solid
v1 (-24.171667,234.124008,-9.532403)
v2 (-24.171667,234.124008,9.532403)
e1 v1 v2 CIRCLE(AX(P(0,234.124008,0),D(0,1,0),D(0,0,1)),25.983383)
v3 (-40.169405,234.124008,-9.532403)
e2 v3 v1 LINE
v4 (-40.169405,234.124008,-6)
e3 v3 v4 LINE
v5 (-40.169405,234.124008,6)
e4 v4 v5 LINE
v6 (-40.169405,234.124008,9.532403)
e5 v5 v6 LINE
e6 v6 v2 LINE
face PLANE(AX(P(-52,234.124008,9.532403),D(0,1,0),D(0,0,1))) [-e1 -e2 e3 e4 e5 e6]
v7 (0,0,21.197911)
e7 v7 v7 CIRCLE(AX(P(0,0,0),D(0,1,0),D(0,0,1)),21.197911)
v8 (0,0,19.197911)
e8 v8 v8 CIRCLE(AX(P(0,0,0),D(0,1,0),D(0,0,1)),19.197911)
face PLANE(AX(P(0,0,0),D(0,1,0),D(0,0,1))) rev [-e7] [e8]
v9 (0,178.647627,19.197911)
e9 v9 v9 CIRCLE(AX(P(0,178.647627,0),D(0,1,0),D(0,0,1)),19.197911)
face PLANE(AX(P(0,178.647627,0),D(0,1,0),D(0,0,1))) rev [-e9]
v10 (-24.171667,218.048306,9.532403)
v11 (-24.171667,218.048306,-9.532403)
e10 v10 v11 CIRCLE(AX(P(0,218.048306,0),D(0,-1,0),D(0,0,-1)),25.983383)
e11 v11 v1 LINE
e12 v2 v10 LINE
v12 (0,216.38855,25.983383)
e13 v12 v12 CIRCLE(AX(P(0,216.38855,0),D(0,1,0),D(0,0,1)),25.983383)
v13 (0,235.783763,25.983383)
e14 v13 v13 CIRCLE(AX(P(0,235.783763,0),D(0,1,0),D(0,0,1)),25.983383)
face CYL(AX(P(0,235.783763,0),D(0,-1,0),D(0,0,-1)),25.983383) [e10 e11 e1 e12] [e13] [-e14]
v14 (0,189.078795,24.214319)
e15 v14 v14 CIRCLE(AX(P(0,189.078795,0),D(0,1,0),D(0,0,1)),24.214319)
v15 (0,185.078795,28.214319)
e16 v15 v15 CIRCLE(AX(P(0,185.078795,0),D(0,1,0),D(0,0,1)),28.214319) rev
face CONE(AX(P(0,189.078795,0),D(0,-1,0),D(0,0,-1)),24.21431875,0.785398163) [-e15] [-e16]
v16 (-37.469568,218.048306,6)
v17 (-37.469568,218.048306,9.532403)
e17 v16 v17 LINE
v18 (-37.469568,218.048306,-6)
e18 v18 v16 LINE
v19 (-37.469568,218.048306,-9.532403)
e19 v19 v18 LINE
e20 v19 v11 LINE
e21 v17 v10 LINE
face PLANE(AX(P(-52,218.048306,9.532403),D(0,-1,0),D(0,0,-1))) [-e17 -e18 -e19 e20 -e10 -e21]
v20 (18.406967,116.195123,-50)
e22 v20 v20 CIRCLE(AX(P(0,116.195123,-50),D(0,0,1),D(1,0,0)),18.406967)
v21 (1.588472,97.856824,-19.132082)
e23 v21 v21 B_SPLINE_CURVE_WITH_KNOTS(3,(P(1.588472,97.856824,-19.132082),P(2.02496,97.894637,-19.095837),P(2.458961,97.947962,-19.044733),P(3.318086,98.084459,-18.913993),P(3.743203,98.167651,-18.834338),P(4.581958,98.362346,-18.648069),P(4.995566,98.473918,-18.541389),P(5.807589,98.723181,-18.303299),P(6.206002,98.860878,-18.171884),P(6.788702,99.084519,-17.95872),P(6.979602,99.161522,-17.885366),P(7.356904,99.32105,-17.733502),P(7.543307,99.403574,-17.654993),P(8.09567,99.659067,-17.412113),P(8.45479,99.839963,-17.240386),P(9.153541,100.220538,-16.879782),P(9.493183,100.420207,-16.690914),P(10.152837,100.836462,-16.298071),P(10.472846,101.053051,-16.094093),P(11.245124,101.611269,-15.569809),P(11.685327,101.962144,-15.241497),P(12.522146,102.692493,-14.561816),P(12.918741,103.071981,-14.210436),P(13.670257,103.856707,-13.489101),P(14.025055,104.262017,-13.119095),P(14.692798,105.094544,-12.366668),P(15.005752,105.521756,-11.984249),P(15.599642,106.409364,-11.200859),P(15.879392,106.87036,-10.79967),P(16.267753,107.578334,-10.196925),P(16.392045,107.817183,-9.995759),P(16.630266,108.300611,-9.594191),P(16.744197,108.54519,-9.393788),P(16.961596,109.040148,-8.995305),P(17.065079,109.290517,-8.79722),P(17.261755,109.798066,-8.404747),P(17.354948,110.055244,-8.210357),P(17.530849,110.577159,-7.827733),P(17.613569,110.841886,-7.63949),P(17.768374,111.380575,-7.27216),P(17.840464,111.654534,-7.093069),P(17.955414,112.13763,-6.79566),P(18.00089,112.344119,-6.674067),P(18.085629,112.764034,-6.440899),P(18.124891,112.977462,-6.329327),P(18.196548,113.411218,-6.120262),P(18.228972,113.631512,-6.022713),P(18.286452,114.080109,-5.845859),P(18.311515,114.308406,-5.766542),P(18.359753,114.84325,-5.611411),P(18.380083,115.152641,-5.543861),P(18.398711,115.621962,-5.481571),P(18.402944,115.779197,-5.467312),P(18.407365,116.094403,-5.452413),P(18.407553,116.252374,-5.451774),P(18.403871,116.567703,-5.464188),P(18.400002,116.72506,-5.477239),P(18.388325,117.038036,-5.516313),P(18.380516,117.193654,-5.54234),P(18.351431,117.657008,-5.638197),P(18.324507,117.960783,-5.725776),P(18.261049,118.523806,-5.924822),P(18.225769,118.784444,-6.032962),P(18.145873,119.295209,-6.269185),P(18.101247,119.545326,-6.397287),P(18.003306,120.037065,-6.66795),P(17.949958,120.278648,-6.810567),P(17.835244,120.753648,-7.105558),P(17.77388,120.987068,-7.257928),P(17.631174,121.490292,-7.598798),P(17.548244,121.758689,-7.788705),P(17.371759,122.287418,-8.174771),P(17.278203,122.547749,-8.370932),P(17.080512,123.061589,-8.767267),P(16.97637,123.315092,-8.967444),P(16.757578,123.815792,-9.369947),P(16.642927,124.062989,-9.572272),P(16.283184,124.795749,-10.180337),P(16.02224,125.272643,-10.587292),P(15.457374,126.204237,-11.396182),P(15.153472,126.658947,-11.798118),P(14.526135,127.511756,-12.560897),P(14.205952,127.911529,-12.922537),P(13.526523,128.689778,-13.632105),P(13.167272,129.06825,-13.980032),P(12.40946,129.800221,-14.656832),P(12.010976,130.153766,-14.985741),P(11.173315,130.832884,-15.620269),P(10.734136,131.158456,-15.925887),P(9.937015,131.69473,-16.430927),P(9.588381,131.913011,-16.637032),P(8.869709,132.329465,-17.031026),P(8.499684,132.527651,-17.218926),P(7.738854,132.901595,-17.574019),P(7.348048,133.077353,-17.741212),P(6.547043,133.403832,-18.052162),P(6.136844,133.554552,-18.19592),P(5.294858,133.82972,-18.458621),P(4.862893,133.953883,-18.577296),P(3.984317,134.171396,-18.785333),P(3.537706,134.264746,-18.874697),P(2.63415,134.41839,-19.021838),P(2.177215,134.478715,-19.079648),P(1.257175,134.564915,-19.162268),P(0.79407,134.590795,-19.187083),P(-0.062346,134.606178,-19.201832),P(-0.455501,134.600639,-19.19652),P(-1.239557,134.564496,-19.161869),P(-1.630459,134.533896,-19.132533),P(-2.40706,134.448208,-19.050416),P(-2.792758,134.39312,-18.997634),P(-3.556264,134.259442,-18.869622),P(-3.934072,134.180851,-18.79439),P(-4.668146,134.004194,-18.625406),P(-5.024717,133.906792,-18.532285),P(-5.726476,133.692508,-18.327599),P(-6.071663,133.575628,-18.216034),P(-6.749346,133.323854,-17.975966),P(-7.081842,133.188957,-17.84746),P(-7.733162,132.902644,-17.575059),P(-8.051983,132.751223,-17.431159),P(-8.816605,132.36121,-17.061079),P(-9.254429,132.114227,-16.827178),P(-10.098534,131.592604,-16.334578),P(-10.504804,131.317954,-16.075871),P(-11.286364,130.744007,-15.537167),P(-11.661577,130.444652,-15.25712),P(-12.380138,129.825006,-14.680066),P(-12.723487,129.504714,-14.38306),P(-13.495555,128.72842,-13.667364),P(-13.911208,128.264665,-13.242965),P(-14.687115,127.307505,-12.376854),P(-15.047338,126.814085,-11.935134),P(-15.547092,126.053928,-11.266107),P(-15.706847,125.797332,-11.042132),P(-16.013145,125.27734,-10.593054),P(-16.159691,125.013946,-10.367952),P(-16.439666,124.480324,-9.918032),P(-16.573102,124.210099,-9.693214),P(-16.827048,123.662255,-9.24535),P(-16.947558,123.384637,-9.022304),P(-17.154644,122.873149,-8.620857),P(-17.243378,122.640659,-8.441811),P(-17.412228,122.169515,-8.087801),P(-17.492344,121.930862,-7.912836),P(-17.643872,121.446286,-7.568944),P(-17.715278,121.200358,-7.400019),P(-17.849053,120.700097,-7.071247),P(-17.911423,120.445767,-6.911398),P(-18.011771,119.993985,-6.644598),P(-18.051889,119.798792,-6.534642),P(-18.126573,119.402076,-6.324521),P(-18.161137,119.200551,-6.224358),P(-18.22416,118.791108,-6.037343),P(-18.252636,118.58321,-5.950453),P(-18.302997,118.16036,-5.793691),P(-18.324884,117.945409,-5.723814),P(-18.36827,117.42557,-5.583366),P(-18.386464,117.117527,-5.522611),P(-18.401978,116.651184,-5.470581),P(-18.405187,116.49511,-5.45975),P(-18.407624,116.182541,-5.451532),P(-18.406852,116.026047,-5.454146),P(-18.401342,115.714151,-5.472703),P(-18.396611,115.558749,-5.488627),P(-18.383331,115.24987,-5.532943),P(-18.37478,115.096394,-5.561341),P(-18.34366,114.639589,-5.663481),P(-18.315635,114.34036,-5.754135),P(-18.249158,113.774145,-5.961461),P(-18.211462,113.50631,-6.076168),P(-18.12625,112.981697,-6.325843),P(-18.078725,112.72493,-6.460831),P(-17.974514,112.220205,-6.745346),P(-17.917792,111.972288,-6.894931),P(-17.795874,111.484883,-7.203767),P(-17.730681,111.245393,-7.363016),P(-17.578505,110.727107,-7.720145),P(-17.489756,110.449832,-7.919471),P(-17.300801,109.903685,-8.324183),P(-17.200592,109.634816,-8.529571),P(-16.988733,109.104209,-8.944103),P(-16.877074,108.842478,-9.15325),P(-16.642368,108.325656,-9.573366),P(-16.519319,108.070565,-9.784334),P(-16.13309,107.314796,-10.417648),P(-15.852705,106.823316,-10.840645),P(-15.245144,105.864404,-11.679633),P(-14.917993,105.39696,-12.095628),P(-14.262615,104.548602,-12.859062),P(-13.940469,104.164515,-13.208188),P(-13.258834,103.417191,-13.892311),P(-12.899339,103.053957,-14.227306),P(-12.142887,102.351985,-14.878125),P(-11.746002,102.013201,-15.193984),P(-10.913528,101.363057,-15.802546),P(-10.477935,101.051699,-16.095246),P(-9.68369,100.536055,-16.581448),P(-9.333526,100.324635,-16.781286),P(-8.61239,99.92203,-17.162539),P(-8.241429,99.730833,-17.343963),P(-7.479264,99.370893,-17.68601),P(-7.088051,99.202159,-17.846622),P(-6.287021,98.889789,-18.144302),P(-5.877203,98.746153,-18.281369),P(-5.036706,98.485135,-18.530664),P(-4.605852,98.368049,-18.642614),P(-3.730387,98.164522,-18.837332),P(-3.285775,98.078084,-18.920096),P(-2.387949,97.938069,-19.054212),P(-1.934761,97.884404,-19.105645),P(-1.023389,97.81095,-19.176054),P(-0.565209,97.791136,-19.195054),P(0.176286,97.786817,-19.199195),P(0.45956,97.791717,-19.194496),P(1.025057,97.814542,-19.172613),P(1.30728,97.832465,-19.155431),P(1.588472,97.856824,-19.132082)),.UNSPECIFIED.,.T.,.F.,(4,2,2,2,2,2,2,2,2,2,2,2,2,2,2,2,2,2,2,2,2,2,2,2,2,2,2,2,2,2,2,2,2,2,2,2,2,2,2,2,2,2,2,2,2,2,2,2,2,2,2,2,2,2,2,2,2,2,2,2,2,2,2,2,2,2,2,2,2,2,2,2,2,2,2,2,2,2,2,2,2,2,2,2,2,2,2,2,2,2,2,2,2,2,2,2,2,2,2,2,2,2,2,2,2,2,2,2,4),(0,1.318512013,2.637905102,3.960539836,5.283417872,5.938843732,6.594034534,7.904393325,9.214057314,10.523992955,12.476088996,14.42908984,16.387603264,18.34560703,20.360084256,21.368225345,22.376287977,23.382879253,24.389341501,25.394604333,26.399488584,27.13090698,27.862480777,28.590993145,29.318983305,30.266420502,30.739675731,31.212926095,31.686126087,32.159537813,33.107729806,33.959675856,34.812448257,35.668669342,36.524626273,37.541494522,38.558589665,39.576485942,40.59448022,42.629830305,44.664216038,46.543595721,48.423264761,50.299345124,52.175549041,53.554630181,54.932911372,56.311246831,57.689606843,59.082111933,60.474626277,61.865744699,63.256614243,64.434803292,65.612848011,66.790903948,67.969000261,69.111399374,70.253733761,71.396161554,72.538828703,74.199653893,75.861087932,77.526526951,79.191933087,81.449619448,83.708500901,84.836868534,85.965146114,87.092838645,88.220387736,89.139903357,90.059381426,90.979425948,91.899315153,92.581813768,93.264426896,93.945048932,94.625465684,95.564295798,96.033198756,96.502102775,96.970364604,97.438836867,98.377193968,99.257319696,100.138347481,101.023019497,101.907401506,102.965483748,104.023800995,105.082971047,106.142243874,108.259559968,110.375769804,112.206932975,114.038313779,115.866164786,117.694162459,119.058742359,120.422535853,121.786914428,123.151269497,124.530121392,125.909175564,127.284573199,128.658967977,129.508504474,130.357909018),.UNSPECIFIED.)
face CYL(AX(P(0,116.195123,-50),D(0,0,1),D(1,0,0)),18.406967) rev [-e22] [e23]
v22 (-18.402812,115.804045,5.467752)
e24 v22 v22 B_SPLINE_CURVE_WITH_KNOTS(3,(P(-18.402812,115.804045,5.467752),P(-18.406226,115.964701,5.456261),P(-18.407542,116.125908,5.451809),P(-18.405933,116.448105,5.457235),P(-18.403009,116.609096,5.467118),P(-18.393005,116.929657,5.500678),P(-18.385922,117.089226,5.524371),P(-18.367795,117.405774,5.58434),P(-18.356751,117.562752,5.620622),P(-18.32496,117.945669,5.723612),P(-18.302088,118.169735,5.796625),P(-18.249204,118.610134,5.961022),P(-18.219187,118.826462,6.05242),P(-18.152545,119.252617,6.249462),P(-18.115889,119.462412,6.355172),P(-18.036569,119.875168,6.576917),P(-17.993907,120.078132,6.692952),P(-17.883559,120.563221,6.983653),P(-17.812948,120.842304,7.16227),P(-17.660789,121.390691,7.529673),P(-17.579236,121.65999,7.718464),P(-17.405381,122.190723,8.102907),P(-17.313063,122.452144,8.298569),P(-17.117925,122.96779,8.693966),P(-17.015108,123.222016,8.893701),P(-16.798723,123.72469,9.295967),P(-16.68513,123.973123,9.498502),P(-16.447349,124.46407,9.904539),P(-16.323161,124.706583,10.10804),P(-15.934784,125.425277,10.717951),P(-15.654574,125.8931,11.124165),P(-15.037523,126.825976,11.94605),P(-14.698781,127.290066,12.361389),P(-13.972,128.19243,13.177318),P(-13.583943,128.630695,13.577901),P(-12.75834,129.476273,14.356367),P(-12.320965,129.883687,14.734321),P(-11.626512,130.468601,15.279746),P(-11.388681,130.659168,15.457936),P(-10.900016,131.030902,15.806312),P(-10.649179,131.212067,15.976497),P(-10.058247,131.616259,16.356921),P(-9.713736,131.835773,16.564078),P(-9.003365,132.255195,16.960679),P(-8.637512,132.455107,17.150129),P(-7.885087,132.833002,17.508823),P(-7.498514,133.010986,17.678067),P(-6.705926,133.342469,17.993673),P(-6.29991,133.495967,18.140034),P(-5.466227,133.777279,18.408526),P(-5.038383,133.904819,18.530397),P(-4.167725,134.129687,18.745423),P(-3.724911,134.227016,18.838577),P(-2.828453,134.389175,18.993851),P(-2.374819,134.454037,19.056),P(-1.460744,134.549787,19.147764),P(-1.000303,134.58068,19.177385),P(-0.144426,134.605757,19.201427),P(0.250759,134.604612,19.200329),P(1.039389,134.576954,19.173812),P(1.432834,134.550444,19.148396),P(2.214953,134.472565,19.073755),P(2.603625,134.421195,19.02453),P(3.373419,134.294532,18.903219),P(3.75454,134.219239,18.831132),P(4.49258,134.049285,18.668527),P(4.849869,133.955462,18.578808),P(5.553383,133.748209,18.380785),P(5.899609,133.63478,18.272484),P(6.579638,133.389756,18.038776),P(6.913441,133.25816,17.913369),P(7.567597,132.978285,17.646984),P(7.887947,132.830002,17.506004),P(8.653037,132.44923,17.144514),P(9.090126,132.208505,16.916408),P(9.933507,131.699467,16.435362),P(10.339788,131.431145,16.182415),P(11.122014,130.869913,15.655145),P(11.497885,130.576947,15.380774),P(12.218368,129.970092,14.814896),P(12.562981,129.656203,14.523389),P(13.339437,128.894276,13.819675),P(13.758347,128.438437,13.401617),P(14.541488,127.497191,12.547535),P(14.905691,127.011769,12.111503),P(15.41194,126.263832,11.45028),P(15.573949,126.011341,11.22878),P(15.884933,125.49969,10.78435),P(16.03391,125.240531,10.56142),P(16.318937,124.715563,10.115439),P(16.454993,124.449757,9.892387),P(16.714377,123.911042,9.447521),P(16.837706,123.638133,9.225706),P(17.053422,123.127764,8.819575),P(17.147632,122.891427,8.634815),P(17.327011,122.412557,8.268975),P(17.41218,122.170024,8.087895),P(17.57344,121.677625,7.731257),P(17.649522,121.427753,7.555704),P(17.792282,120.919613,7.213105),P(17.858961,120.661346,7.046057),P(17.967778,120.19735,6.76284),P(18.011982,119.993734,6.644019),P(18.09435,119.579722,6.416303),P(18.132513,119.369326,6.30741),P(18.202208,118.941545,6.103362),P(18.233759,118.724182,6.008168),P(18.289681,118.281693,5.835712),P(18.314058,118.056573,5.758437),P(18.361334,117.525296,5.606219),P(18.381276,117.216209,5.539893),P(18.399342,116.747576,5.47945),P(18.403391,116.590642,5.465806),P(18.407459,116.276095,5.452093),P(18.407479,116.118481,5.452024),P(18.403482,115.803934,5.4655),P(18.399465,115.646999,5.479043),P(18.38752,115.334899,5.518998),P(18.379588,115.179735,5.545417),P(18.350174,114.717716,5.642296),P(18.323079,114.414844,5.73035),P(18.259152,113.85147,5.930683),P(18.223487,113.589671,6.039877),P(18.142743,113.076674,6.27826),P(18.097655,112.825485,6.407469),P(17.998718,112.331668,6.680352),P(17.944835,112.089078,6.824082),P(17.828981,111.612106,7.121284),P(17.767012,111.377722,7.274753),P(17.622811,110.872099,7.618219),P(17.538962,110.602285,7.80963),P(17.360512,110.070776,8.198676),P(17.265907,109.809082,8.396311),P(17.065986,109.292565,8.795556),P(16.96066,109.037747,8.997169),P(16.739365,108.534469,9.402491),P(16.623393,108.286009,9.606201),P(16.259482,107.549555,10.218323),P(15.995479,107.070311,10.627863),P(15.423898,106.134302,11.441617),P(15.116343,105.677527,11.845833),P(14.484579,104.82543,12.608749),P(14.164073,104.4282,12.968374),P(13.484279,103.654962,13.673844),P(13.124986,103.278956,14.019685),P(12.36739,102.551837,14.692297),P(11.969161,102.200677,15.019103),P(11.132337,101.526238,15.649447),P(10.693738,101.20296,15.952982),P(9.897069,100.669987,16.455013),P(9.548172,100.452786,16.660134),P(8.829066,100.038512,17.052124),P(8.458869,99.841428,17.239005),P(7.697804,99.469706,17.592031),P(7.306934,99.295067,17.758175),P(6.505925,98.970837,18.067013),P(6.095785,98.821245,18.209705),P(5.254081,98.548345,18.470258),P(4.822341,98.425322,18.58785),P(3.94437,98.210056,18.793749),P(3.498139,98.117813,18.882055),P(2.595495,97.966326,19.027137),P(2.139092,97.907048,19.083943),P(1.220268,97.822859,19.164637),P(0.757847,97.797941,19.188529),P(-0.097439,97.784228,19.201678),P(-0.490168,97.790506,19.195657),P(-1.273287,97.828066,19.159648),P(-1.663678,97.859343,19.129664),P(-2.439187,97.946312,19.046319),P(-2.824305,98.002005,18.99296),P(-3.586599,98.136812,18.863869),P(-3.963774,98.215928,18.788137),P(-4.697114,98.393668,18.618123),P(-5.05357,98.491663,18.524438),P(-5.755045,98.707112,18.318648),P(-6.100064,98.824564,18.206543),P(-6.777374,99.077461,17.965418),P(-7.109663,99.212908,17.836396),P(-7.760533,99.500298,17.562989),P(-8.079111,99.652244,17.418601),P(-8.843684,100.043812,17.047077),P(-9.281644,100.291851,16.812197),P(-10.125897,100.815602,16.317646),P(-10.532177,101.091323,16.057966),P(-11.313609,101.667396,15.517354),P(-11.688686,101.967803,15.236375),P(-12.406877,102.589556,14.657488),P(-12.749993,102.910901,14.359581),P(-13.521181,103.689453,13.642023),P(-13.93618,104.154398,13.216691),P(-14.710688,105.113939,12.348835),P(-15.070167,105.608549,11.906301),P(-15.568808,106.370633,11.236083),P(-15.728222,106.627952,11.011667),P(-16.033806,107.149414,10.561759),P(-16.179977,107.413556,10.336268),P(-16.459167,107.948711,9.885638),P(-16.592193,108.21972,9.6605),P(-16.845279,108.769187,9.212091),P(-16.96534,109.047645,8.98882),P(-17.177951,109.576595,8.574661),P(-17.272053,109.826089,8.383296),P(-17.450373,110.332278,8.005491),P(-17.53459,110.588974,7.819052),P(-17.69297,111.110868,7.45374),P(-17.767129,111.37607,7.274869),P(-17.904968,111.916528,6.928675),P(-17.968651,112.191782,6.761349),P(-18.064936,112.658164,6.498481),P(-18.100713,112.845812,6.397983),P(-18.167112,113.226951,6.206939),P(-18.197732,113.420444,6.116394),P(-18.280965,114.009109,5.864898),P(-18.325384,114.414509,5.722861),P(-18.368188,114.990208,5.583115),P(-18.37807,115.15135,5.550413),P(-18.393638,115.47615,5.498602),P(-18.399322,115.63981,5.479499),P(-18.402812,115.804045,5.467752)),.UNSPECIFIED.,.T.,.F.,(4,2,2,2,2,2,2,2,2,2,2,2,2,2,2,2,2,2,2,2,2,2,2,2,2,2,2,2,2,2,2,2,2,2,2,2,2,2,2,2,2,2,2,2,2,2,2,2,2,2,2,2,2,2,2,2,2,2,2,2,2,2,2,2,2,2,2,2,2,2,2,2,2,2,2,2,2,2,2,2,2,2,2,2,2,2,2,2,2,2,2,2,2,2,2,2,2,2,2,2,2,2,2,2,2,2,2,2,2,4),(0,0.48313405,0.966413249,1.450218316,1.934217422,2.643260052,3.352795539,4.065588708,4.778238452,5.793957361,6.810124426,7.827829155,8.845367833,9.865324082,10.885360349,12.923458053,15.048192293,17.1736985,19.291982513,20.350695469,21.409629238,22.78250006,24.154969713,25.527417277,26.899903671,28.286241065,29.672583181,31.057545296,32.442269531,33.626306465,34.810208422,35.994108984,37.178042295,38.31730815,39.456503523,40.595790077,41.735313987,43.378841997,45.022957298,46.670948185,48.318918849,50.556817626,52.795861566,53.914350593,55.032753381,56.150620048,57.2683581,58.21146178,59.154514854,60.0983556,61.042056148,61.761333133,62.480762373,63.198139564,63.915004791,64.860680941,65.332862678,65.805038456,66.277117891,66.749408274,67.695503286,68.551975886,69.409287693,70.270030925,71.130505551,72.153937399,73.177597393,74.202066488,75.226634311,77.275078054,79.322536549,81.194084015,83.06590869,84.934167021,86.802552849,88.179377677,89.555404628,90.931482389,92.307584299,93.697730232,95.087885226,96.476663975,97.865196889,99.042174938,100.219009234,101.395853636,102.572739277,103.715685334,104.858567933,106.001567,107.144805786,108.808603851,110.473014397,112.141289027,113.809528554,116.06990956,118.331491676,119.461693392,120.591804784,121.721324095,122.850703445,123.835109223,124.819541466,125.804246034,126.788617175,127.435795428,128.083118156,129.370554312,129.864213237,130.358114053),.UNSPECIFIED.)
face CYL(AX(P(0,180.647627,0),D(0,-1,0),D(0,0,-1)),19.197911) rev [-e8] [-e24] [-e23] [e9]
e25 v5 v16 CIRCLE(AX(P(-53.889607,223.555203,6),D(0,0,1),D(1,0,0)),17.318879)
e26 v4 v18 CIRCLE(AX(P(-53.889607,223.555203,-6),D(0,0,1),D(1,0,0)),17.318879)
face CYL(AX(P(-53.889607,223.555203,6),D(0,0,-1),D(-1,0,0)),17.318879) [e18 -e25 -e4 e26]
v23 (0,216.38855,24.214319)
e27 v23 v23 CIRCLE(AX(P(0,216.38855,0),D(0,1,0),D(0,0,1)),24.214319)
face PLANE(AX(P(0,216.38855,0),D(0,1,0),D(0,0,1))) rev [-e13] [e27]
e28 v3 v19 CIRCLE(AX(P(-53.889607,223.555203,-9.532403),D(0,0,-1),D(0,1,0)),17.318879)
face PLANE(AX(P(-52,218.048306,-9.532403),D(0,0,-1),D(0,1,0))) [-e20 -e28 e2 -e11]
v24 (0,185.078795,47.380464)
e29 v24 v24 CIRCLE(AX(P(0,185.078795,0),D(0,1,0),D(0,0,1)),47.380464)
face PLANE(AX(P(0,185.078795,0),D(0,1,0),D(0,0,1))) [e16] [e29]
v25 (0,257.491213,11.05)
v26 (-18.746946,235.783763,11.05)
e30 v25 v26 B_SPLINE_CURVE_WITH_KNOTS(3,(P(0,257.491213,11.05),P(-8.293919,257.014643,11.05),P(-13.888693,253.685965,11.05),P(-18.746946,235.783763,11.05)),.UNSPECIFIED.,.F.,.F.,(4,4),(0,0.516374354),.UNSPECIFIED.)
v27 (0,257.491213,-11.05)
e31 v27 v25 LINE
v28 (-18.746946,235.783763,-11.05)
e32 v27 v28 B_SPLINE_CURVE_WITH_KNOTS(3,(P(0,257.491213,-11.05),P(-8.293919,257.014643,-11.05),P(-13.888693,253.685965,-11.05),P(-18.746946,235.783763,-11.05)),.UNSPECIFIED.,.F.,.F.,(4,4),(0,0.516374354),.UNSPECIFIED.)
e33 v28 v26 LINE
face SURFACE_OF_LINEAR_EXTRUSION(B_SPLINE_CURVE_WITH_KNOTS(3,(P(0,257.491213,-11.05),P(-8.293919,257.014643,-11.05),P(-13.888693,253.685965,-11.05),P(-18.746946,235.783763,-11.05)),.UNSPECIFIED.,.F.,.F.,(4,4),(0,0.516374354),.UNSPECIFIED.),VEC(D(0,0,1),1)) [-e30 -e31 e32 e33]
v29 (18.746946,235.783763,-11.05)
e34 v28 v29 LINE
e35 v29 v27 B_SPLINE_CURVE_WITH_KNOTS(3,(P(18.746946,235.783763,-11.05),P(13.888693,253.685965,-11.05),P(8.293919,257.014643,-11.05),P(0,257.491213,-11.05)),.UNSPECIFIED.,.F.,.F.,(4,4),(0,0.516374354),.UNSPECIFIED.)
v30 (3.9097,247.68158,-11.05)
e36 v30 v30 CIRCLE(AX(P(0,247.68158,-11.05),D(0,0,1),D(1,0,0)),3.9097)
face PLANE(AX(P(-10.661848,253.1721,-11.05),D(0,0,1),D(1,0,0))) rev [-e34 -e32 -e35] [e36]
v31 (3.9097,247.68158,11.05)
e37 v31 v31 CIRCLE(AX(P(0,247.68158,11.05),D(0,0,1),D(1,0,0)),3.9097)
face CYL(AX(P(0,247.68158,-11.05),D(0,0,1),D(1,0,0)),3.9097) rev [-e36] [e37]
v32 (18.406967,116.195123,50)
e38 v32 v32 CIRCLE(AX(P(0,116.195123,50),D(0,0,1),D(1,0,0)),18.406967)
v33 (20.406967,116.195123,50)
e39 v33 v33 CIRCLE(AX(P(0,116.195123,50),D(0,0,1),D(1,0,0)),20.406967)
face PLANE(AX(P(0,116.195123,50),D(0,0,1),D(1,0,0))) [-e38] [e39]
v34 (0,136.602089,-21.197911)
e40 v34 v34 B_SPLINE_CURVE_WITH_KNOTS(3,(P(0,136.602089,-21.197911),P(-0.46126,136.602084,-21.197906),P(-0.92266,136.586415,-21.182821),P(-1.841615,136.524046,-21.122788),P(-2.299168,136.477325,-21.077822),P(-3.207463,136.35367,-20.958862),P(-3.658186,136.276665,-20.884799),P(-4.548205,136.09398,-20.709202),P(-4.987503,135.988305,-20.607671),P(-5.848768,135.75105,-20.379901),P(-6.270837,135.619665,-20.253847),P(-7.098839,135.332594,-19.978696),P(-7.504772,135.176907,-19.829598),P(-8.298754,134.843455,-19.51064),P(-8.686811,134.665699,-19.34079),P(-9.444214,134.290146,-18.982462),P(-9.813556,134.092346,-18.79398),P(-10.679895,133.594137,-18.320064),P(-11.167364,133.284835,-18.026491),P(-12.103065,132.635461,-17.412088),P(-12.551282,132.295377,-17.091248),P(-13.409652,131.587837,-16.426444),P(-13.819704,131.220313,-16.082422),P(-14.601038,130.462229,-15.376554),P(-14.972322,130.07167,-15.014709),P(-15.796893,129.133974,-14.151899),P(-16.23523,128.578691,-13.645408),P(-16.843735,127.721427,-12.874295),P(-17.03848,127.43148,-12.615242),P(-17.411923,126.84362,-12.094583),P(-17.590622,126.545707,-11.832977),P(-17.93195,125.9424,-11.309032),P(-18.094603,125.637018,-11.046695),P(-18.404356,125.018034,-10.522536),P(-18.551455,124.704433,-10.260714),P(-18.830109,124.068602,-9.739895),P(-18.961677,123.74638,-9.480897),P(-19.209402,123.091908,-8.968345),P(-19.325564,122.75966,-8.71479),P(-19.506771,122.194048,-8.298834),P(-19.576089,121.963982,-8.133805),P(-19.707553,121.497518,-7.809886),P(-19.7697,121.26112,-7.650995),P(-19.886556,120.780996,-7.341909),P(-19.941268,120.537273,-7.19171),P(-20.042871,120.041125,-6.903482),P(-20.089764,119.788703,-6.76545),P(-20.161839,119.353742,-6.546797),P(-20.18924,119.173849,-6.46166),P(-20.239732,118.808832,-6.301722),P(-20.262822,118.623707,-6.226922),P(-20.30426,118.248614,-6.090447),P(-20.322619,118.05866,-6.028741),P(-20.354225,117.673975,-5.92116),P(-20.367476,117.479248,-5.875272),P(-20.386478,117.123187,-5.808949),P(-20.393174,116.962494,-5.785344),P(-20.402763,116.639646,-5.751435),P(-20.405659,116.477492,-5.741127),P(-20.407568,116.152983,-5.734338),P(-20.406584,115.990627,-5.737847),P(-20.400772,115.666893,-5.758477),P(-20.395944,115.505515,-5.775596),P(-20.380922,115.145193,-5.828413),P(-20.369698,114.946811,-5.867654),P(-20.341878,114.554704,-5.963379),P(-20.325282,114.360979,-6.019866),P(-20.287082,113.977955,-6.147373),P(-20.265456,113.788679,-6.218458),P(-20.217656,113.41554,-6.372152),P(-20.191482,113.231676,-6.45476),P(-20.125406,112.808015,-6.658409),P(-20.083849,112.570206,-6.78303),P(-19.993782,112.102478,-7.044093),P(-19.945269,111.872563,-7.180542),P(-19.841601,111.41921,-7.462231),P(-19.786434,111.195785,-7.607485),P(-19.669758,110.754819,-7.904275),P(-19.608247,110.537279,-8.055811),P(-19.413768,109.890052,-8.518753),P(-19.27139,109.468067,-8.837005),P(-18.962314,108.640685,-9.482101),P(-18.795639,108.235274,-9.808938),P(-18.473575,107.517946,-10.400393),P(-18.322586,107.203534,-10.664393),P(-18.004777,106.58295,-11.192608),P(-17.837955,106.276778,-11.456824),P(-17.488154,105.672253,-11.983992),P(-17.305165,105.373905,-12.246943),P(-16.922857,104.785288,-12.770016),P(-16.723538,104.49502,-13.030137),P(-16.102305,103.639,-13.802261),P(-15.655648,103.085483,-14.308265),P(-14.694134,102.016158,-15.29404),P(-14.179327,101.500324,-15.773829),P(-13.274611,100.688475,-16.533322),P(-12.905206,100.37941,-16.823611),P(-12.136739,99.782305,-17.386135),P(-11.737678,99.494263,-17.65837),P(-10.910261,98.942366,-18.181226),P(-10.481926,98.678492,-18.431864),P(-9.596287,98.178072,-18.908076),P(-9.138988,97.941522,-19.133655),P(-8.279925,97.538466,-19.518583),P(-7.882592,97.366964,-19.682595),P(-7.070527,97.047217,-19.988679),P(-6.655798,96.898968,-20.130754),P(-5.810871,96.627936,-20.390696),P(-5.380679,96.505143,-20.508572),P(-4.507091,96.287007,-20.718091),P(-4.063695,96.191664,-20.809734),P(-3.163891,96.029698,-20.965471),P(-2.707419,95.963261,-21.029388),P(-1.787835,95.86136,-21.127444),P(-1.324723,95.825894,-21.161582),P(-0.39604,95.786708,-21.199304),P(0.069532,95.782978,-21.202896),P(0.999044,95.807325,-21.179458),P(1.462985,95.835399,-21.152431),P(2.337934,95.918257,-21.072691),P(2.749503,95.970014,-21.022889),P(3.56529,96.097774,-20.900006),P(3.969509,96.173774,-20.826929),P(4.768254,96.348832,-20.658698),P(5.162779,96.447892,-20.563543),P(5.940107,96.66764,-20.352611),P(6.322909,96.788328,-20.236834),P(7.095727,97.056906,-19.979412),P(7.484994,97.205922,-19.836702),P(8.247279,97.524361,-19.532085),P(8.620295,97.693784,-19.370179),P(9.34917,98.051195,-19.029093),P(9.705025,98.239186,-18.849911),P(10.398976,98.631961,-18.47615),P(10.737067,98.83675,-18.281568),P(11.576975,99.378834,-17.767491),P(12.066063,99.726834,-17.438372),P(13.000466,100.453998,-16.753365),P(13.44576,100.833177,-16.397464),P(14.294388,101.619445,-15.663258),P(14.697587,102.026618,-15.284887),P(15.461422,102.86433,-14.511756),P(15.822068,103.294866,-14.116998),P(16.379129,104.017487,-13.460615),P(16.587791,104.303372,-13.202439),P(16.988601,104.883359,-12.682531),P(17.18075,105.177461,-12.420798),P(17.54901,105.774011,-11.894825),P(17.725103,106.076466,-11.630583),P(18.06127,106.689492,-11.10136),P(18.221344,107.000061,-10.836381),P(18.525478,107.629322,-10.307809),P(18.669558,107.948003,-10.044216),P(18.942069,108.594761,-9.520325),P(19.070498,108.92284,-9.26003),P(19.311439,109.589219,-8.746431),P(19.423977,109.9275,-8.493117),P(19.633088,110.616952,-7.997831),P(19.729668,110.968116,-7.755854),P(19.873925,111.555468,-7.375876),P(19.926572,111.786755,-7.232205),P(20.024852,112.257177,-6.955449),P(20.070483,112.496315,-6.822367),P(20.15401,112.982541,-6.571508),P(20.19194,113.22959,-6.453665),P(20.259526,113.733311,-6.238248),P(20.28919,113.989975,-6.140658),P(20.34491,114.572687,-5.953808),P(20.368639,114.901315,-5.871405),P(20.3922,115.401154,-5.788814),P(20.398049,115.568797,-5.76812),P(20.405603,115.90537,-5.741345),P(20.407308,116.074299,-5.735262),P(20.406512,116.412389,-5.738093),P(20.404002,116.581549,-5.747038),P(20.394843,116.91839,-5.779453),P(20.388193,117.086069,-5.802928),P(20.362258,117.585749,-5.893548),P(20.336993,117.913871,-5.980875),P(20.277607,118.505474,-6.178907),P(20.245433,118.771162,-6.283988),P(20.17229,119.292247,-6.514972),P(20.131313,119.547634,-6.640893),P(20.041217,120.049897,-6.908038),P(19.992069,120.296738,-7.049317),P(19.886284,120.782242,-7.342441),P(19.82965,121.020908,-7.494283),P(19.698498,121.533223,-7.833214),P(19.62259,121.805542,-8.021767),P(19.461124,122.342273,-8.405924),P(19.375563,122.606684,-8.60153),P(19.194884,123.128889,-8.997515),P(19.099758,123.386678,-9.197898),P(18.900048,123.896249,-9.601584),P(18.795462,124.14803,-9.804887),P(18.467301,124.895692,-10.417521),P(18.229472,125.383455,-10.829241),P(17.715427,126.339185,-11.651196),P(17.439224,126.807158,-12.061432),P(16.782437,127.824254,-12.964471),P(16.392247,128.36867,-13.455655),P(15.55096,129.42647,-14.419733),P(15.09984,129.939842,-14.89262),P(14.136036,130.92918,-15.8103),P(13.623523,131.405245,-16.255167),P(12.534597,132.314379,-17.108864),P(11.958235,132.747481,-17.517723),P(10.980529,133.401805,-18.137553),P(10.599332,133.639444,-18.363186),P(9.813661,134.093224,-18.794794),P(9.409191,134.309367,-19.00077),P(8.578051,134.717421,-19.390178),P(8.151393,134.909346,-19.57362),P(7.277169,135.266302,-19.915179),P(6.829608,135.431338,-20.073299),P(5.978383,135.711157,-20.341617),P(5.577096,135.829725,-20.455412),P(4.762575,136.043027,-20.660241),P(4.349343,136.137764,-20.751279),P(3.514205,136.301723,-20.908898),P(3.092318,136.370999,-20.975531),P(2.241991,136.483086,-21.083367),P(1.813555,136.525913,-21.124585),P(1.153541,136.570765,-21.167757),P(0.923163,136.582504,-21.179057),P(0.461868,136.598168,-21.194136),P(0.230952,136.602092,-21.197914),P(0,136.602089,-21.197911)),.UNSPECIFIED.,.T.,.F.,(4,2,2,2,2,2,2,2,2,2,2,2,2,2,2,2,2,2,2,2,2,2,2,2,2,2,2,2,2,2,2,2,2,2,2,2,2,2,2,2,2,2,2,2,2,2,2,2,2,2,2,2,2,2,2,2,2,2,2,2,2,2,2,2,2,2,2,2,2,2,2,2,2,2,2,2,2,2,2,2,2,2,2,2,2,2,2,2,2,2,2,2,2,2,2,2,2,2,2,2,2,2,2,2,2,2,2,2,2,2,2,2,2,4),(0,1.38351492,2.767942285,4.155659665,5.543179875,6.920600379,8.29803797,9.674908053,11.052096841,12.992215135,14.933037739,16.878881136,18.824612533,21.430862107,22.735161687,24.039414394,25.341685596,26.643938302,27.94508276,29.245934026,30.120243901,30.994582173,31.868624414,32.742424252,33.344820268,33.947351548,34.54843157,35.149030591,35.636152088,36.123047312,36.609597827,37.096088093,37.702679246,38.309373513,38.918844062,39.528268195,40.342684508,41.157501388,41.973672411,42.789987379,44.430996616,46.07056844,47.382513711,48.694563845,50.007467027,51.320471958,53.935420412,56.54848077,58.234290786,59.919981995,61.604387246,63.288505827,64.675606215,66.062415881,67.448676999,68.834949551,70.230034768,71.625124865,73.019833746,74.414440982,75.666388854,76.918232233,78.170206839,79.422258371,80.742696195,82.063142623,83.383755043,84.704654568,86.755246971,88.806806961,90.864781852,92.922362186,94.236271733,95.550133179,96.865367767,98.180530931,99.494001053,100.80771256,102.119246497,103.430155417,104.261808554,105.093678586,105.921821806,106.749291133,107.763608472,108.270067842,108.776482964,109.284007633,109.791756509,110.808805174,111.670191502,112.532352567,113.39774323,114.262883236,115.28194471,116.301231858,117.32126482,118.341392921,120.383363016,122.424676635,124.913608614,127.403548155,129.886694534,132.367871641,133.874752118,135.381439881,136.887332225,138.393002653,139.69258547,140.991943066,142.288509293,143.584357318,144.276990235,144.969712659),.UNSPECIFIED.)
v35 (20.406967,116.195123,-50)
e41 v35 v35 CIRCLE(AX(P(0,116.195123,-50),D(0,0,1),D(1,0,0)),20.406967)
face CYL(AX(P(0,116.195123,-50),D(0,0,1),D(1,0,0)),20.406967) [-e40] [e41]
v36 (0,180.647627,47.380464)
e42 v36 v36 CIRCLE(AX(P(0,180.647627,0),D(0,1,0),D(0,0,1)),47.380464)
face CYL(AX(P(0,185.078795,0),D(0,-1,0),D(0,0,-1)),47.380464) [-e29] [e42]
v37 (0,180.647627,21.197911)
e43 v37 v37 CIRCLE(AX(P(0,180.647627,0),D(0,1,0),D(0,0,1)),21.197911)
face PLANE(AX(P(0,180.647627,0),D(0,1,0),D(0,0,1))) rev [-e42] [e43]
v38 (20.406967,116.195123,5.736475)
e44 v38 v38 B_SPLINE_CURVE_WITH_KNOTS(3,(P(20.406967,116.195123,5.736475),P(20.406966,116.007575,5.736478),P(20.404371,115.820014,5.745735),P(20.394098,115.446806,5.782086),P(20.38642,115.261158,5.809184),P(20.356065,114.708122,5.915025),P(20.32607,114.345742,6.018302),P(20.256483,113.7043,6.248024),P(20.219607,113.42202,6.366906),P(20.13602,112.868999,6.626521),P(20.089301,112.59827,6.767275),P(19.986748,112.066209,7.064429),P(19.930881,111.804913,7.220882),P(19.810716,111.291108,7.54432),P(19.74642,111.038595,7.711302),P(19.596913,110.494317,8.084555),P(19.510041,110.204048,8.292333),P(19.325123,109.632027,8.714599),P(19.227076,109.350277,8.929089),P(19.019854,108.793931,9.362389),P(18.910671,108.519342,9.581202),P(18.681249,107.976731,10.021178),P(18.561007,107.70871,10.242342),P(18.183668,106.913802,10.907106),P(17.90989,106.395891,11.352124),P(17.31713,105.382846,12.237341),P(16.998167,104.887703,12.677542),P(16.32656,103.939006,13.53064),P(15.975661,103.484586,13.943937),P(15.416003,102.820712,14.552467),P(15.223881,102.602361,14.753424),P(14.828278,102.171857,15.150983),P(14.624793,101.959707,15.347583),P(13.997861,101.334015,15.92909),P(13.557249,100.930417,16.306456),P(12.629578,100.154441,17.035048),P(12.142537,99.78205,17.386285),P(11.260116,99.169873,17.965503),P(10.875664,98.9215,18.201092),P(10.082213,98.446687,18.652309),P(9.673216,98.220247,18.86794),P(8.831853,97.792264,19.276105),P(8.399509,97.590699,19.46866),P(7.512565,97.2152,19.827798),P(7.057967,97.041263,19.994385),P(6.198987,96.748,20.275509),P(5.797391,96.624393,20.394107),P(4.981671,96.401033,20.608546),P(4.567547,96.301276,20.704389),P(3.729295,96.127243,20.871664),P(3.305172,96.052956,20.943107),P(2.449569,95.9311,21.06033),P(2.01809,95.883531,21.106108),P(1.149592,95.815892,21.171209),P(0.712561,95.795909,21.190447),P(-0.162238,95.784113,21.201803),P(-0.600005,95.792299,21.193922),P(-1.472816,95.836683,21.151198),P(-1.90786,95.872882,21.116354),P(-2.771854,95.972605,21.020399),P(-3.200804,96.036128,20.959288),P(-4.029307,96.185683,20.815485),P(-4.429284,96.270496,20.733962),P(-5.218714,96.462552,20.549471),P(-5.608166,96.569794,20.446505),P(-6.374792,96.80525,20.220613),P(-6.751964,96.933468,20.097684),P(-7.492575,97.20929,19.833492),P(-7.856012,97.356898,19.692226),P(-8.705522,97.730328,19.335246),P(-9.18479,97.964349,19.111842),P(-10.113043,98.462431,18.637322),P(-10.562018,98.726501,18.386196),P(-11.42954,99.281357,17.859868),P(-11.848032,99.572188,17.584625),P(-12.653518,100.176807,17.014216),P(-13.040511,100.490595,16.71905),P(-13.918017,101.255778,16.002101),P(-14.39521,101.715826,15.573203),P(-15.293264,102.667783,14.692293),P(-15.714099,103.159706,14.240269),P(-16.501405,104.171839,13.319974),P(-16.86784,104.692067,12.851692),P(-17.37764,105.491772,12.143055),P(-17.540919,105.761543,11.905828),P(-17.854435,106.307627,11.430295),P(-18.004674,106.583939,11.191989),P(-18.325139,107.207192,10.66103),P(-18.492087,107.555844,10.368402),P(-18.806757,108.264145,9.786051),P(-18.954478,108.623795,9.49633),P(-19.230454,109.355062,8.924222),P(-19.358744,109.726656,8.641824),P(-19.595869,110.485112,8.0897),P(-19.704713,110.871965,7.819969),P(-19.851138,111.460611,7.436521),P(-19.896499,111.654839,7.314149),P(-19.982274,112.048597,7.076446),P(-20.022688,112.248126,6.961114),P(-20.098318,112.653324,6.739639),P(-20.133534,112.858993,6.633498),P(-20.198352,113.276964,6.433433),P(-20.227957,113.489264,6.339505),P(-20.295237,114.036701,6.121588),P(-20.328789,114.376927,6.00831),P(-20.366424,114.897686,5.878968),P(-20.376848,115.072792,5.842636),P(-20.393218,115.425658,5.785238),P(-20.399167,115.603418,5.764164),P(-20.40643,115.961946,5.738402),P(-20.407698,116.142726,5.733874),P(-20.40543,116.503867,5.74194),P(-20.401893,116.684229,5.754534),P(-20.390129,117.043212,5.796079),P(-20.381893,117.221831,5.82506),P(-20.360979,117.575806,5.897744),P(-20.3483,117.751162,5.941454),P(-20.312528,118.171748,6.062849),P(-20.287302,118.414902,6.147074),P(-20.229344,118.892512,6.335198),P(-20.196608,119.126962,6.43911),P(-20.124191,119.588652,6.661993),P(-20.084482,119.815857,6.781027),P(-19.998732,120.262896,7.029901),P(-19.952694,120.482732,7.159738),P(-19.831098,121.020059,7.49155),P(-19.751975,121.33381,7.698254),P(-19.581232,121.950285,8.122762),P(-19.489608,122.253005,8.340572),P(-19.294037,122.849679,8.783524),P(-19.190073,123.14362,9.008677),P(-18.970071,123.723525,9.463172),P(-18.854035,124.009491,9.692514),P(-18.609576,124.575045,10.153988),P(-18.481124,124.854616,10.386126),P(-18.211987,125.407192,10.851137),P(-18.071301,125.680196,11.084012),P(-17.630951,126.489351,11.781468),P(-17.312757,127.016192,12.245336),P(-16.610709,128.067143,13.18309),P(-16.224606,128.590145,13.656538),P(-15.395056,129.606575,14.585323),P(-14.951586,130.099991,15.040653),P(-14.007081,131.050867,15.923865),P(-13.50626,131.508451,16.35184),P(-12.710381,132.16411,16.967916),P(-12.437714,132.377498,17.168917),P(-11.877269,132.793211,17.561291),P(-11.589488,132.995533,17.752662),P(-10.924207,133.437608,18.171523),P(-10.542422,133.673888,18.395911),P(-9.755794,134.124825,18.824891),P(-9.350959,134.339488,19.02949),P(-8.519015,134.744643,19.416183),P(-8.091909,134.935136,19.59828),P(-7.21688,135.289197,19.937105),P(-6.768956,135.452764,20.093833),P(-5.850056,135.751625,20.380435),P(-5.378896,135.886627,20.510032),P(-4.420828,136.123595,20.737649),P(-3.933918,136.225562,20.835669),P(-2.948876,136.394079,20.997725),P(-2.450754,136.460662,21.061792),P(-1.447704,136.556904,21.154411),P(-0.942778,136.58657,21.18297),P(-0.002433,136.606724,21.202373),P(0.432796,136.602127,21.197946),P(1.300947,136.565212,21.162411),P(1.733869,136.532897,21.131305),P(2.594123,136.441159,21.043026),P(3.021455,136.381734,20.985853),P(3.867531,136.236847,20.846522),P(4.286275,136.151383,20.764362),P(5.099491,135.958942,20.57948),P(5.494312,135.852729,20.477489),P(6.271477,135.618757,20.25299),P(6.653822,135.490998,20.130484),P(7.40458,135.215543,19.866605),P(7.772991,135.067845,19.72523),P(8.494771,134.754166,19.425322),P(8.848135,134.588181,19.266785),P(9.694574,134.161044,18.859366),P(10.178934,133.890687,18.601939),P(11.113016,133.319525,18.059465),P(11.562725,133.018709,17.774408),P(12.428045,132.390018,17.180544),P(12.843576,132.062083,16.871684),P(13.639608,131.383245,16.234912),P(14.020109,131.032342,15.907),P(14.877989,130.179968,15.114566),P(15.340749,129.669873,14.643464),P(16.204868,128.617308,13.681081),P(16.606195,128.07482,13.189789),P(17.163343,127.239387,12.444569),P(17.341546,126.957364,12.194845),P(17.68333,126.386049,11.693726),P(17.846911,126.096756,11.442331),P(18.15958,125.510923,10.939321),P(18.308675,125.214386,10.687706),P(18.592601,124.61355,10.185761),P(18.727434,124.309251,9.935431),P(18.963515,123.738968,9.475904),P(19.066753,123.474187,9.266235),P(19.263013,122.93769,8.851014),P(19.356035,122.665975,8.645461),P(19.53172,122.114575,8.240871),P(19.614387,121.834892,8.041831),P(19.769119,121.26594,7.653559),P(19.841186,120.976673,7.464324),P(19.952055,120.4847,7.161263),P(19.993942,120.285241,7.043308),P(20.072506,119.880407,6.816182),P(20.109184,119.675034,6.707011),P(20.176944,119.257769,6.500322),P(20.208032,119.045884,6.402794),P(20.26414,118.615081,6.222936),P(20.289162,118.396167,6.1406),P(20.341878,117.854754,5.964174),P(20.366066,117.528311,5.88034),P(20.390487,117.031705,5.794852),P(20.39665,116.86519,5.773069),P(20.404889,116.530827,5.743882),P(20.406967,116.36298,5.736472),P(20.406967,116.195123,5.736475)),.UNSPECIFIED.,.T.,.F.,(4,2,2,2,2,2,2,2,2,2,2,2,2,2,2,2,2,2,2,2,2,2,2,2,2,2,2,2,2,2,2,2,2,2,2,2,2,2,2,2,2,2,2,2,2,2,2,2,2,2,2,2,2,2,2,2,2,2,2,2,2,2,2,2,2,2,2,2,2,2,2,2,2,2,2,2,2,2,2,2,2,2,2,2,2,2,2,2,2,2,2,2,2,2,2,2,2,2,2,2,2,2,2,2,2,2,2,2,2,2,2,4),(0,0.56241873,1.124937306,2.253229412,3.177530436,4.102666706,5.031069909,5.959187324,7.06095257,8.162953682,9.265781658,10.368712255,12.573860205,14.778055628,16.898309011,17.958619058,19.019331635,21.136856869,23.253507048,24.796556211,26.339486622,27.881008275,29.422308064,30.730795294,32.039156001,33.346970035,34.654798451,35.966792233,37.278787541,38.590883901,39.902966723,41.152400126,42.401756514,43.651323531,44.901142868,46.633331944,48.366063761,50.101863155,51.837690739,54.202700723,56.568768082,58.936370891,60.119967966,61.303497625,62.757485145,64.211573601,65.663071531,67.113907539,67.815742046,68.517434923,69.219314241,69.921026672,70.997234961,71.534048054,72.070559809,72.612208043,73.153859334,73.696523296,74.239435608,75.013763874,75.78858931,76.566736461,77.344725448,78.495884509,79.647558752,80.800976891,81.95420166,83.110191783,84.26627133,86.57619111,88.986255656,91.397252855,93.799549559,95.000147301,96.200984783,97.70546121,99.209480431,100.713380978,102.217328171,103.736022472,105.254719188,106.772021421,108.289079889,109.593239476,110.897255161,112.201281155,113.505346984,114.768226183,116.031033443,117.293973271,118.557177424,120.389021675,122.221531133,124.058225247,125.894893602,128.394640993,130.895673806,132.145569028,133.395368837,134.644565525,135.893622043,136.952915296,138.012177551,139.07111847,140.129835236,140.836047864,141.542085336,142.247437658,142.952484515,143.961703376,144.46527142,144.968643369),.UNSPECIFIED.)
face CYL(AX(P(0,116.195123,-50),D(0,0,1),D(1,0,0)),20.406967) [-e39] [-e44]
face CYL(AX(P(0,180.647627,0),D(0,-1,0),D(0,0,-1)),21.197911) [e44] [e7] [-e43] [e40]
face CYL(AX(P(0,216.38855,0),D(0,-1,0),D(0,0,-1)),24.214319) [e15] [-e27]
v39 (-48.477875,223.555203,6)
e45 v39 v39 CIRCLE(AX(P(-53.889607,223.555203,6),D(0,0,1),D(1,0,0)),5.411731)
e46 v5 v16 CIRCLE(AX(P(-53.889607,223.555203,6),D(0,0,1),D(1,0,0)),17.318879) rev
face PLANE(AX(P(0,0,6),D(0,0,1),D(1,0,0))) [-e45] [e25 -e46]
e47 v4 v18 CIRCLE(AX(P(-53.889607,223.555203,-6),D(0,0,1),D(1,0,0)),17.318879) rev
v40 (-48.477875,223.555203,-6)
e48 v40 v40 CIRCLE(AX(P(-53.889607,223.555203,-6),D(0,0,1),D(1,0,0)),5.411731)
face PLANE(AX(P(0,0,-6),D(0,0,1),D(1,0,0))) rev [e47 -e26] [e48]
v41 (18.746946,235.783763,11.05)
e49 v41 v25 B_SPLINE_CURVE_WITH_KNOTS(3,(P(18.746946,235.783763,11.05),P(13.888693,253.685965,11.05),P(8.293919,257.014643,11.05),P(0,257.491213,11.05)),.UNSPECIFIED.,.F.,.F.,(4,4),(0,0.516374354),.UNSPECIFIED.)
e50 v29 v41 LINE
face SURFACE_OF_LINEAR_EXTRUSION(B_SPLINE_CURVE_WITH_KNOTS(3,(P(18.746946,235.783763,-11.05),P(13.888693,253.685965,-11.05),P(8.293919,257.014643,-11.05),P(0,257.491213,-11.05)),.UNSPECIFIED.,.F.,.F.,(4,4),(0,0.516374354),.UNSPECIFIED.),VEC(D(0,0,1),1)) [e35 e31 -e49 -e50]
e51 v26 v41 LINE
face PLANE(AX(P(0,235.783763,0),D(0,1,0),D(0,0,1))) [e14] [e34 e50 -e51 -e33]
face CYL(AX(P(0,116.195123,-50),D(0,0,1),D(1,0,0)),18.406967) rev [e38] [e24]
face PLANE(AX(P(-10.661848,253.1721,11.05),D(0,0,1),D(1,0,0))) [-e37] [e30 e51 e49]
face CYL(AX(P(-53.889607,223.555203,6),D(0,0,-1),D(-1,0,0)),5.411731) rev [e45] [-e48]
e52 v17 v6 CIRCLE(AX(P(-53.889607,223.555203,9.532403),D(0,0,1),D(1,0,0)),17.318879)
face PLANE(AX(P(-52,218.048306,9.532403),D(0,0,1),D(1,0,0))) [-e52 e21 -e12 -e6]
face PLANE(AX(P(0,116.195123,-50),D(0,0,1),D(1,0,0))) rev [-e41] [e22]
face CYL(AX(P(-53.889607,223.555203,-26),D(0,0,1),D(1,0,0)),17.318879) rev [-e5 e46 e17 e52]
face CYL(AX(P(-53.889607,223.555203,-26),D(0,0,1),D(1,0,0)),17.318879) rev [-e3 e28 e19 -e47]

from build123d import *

# Parameters (mm, degrees)
SKETCH7_R           = 21.1979112
BOSS_EXTRUDE1_DEPTH = 180.647627
SKETCH12_R          = 20.406966807
BOSS_EXTRUDE6_DEPTH = 50
SHELL1_START        = -50
SHELL1_OUTLINE_R    = 18.406966807
SHELL1_DEPTH        = 100
SHELL1_2_OUTLINE_R  = 19.1979112
SHELL1_2_DEPTH      = 178.6476265
SKETCH8_R           = 47.3804642
BOSS_EXTRUDE2_DEPTH = 4.431169
SKETCH9_R           = 24.21431875
BOSS_EXTRUDE3_DEPTH = 31.309755
SKETCH10_R          = 25.98338315
BOSS_EXTRUDE4_DEPTH = 19.395214
CHAMFER1_SIZE       = 4
SKETCH11_R          = 3.909700179
BOSS_EXTRUDE5_DEPTH = 11.05
SKETCH13_W          = 19.064805676
SKETCH13_H          = 16.075701836
BOSS_EXTRUDE7_DEPTH = 52
SKETCH14_R          = 17.318879346
SKETCH14_R_2        = 11.636848892
SKETCH14_R_3        = 5.411731441
CUT_EXTRUDE1_DEPTH  = 26
SKETCH14_5_R        = 17.318879346
SKETCH14_5_R_2      = 5.411731441
BOSS_EXTRUDE9_DEPTH = 6


with BuildPart() as part:
    # Sketch7 → Boss-Extrude1 (new body)
    with BuildSketch(Plane(origin=(0, 0, 0), x_dir=(1, 0, 0), z_dir=(0, 1, 0))):
        with Locations(Location((0, 0, 0), (0, 0, 270))):
            Circle(SKETCH7_R)
    extrude(amount=BOSS_EXTRUDE1_DEPTH)

    # Sketch12 → Boss-Extrude6 (add, symmetric)
    with BuildSketch(Plane.XY):
        with Locations((0, 116.195122616)):
            Circle(SKETCH12_R)
    extrude(amount=BOSS_EXTRUDE6_DEPTH, both=True)

    # Shell1: read off the stored shape, not the designer's step
    # Shell1 outline → Shell1 (cut)
    with BuildSketch(Plane.XY.offset(SHELL1_START)):
        with Locations((0, 116.195122616)):
            Circle(SHELL1_OUTLINE_R)
    extrude(amount=SHELL1_DEPTH, mode=Mode.SUBTRACT)

    # Shell1 2 outline → Shell1 2 (cut)
    with BuildSketch(Plane(origin=(0, 0, 0), x_dir=(1, 0, 0), z_dir=(0, 1, 0))):
        Circle(SHELL1_2_OUTLINE_R)
    extrude(amount=SHELL1_2_DEPTH, mode=Mode.SUBTRACT)

    # Sketch8 → Boss-Extrude2 (add)
    with BuildSketch(Plane(origin=(0, 180.6476265, 0), x_dir=(1, 0, 0), z_dir=(0, 1, 0))):
        with Locations(Location((0, 0, 0), (0, 0, 270))):
            Circle(SKETCH8_R)
    extrude(amount=BOSS_EXTRUDE2_DEPTH)

    # Sketch9 → Boss-Extrude3 (add)
    with BuildSketch(Plane(origin=(0, 185.0787951, 0), x_dir=(1, 0, 0), z_dir=(0, 1, 0))):
        with Locations(Location((0, 0, 0), (0, 0, 270))):
            Circle(SKETCH9_R)
    extrude(amount=BOSS_EXTRUDE3_DEPTH)

    # Sketch10 → Boss-Extrude4 (add)
    with BuildSketch(Plane(origin=(0, 216.3885498, 0), x_dir=(1, 0, 0), z_dir=(0, 1, 0))):
        with Locations(Location((0, 0, 0), (0, 0, 270))):
            Circle(SKETCH10_R)
    extrude(amount=BOSS_EXTRUDE4_DEPTH)

    # Chamfer1
    chamfer1_edges = [part.edges().sort_by_distance(p)[0] for p in [
        (0, 185.0787951, -24.21431875),
    ]]
    chamfer(chamfer1_edges, length=CHAMFER1_SIZE)

    # Sketch11 → Boss-Extrude5 (add, symmetric)
    with BuildSketch(Plane.XY):
        with BuildLine():
            Line((-18.74694623, 235.7837635), (18.74694623, 235.7837635))
            add(Edge.make_bspline(
                [(18.74694623, 235.7837635), (13.888692834, 253.685965272), (8.293919463, 257.014643256), (0, 257.491213049)],
                knots=[0, 0, 0, 0, 0.516374354, 0.516374354, 0.516374354, 0.516374354], degree=3))
            add(Edge.make_bspline(
                [(-18.74694623, 235.7837635), (-13.888692834, 253.685965272), (-8.293919463, 257.014643256), (0, 257.491213049)],
                knots=[0, 0, 0, 0, 0.516374354, 0.516374354, 0.516374354, 0.516374354], degree=3))
        make_face()
        with Locations((0, 247.681579845)):
            Circle(SKETCH11_R, mode=Mode.SUBTRACT)
    extrude(amount=BOSS_EXTRUDE5_DEPTH, both=True)

    # Sketch13 → Boss-Extrude7 (add)
    with BuildSketch(Plane(origin=(0, 0, 0), x_dir=(0, 0, -1), z_dir=(1, 0, 0))):
        with Locations((0, 226.08615665)):
            Rectangle(SKETCH13_W, SKETCH13_H)
    extrude(amount=-BOSS_EXTRUDE7_DEPTH)

    # Sketch14 → Cut-Extrude1 (cut, symmetric)
    # profile 1 of 2: a face of its own
    with BuildSketch(Plane.XY):
        with Locations((-53.889606886, 223.55520268)):
            Circle(SKETCH14_R)
        with Locations((-53.889606886, 223.55520268)):
            Circle(SKETCH14_R_2, mode=Mode.SUBTRACT)
    # profile 2 of 2: a face of its own
    with BuildSketch(Plane.XY):
        with Locations((-53.889606886, 223.55520268)):
            Circle(SKETCH14_R_3)
    extrude(amount=CUT_EXTRUDE1_DEPTH, both=True, mode=Mode.SUBTRACT)


with BuildPart() as cut_extrude1_kept_piece:
    # of the separate pieces the step leaves, the one the design keeps (cut_extrude1_pieces_kept)
    add(part.part.solids().sort_by_distance((0, 189.0787955, 24.21431875))[0])

    # Sketch14<5> → Boss-Extrude9 (add, symmetric)
    with BuildSketch(Plane.XY):
        with Locations((-53.889606886, 223.55520268)):
            Circle(SKETCH14_5_R)
        with Locations((-53.889606886, 223.55520268)):
            Circle(SKETCH14_5_R_2, mode=Mode.SUBTRACT)
    extrude(amount=BOSS_EXTRUDE9_DEPTH, both=True)


solid = cut_extrude1_kept_piece.part
